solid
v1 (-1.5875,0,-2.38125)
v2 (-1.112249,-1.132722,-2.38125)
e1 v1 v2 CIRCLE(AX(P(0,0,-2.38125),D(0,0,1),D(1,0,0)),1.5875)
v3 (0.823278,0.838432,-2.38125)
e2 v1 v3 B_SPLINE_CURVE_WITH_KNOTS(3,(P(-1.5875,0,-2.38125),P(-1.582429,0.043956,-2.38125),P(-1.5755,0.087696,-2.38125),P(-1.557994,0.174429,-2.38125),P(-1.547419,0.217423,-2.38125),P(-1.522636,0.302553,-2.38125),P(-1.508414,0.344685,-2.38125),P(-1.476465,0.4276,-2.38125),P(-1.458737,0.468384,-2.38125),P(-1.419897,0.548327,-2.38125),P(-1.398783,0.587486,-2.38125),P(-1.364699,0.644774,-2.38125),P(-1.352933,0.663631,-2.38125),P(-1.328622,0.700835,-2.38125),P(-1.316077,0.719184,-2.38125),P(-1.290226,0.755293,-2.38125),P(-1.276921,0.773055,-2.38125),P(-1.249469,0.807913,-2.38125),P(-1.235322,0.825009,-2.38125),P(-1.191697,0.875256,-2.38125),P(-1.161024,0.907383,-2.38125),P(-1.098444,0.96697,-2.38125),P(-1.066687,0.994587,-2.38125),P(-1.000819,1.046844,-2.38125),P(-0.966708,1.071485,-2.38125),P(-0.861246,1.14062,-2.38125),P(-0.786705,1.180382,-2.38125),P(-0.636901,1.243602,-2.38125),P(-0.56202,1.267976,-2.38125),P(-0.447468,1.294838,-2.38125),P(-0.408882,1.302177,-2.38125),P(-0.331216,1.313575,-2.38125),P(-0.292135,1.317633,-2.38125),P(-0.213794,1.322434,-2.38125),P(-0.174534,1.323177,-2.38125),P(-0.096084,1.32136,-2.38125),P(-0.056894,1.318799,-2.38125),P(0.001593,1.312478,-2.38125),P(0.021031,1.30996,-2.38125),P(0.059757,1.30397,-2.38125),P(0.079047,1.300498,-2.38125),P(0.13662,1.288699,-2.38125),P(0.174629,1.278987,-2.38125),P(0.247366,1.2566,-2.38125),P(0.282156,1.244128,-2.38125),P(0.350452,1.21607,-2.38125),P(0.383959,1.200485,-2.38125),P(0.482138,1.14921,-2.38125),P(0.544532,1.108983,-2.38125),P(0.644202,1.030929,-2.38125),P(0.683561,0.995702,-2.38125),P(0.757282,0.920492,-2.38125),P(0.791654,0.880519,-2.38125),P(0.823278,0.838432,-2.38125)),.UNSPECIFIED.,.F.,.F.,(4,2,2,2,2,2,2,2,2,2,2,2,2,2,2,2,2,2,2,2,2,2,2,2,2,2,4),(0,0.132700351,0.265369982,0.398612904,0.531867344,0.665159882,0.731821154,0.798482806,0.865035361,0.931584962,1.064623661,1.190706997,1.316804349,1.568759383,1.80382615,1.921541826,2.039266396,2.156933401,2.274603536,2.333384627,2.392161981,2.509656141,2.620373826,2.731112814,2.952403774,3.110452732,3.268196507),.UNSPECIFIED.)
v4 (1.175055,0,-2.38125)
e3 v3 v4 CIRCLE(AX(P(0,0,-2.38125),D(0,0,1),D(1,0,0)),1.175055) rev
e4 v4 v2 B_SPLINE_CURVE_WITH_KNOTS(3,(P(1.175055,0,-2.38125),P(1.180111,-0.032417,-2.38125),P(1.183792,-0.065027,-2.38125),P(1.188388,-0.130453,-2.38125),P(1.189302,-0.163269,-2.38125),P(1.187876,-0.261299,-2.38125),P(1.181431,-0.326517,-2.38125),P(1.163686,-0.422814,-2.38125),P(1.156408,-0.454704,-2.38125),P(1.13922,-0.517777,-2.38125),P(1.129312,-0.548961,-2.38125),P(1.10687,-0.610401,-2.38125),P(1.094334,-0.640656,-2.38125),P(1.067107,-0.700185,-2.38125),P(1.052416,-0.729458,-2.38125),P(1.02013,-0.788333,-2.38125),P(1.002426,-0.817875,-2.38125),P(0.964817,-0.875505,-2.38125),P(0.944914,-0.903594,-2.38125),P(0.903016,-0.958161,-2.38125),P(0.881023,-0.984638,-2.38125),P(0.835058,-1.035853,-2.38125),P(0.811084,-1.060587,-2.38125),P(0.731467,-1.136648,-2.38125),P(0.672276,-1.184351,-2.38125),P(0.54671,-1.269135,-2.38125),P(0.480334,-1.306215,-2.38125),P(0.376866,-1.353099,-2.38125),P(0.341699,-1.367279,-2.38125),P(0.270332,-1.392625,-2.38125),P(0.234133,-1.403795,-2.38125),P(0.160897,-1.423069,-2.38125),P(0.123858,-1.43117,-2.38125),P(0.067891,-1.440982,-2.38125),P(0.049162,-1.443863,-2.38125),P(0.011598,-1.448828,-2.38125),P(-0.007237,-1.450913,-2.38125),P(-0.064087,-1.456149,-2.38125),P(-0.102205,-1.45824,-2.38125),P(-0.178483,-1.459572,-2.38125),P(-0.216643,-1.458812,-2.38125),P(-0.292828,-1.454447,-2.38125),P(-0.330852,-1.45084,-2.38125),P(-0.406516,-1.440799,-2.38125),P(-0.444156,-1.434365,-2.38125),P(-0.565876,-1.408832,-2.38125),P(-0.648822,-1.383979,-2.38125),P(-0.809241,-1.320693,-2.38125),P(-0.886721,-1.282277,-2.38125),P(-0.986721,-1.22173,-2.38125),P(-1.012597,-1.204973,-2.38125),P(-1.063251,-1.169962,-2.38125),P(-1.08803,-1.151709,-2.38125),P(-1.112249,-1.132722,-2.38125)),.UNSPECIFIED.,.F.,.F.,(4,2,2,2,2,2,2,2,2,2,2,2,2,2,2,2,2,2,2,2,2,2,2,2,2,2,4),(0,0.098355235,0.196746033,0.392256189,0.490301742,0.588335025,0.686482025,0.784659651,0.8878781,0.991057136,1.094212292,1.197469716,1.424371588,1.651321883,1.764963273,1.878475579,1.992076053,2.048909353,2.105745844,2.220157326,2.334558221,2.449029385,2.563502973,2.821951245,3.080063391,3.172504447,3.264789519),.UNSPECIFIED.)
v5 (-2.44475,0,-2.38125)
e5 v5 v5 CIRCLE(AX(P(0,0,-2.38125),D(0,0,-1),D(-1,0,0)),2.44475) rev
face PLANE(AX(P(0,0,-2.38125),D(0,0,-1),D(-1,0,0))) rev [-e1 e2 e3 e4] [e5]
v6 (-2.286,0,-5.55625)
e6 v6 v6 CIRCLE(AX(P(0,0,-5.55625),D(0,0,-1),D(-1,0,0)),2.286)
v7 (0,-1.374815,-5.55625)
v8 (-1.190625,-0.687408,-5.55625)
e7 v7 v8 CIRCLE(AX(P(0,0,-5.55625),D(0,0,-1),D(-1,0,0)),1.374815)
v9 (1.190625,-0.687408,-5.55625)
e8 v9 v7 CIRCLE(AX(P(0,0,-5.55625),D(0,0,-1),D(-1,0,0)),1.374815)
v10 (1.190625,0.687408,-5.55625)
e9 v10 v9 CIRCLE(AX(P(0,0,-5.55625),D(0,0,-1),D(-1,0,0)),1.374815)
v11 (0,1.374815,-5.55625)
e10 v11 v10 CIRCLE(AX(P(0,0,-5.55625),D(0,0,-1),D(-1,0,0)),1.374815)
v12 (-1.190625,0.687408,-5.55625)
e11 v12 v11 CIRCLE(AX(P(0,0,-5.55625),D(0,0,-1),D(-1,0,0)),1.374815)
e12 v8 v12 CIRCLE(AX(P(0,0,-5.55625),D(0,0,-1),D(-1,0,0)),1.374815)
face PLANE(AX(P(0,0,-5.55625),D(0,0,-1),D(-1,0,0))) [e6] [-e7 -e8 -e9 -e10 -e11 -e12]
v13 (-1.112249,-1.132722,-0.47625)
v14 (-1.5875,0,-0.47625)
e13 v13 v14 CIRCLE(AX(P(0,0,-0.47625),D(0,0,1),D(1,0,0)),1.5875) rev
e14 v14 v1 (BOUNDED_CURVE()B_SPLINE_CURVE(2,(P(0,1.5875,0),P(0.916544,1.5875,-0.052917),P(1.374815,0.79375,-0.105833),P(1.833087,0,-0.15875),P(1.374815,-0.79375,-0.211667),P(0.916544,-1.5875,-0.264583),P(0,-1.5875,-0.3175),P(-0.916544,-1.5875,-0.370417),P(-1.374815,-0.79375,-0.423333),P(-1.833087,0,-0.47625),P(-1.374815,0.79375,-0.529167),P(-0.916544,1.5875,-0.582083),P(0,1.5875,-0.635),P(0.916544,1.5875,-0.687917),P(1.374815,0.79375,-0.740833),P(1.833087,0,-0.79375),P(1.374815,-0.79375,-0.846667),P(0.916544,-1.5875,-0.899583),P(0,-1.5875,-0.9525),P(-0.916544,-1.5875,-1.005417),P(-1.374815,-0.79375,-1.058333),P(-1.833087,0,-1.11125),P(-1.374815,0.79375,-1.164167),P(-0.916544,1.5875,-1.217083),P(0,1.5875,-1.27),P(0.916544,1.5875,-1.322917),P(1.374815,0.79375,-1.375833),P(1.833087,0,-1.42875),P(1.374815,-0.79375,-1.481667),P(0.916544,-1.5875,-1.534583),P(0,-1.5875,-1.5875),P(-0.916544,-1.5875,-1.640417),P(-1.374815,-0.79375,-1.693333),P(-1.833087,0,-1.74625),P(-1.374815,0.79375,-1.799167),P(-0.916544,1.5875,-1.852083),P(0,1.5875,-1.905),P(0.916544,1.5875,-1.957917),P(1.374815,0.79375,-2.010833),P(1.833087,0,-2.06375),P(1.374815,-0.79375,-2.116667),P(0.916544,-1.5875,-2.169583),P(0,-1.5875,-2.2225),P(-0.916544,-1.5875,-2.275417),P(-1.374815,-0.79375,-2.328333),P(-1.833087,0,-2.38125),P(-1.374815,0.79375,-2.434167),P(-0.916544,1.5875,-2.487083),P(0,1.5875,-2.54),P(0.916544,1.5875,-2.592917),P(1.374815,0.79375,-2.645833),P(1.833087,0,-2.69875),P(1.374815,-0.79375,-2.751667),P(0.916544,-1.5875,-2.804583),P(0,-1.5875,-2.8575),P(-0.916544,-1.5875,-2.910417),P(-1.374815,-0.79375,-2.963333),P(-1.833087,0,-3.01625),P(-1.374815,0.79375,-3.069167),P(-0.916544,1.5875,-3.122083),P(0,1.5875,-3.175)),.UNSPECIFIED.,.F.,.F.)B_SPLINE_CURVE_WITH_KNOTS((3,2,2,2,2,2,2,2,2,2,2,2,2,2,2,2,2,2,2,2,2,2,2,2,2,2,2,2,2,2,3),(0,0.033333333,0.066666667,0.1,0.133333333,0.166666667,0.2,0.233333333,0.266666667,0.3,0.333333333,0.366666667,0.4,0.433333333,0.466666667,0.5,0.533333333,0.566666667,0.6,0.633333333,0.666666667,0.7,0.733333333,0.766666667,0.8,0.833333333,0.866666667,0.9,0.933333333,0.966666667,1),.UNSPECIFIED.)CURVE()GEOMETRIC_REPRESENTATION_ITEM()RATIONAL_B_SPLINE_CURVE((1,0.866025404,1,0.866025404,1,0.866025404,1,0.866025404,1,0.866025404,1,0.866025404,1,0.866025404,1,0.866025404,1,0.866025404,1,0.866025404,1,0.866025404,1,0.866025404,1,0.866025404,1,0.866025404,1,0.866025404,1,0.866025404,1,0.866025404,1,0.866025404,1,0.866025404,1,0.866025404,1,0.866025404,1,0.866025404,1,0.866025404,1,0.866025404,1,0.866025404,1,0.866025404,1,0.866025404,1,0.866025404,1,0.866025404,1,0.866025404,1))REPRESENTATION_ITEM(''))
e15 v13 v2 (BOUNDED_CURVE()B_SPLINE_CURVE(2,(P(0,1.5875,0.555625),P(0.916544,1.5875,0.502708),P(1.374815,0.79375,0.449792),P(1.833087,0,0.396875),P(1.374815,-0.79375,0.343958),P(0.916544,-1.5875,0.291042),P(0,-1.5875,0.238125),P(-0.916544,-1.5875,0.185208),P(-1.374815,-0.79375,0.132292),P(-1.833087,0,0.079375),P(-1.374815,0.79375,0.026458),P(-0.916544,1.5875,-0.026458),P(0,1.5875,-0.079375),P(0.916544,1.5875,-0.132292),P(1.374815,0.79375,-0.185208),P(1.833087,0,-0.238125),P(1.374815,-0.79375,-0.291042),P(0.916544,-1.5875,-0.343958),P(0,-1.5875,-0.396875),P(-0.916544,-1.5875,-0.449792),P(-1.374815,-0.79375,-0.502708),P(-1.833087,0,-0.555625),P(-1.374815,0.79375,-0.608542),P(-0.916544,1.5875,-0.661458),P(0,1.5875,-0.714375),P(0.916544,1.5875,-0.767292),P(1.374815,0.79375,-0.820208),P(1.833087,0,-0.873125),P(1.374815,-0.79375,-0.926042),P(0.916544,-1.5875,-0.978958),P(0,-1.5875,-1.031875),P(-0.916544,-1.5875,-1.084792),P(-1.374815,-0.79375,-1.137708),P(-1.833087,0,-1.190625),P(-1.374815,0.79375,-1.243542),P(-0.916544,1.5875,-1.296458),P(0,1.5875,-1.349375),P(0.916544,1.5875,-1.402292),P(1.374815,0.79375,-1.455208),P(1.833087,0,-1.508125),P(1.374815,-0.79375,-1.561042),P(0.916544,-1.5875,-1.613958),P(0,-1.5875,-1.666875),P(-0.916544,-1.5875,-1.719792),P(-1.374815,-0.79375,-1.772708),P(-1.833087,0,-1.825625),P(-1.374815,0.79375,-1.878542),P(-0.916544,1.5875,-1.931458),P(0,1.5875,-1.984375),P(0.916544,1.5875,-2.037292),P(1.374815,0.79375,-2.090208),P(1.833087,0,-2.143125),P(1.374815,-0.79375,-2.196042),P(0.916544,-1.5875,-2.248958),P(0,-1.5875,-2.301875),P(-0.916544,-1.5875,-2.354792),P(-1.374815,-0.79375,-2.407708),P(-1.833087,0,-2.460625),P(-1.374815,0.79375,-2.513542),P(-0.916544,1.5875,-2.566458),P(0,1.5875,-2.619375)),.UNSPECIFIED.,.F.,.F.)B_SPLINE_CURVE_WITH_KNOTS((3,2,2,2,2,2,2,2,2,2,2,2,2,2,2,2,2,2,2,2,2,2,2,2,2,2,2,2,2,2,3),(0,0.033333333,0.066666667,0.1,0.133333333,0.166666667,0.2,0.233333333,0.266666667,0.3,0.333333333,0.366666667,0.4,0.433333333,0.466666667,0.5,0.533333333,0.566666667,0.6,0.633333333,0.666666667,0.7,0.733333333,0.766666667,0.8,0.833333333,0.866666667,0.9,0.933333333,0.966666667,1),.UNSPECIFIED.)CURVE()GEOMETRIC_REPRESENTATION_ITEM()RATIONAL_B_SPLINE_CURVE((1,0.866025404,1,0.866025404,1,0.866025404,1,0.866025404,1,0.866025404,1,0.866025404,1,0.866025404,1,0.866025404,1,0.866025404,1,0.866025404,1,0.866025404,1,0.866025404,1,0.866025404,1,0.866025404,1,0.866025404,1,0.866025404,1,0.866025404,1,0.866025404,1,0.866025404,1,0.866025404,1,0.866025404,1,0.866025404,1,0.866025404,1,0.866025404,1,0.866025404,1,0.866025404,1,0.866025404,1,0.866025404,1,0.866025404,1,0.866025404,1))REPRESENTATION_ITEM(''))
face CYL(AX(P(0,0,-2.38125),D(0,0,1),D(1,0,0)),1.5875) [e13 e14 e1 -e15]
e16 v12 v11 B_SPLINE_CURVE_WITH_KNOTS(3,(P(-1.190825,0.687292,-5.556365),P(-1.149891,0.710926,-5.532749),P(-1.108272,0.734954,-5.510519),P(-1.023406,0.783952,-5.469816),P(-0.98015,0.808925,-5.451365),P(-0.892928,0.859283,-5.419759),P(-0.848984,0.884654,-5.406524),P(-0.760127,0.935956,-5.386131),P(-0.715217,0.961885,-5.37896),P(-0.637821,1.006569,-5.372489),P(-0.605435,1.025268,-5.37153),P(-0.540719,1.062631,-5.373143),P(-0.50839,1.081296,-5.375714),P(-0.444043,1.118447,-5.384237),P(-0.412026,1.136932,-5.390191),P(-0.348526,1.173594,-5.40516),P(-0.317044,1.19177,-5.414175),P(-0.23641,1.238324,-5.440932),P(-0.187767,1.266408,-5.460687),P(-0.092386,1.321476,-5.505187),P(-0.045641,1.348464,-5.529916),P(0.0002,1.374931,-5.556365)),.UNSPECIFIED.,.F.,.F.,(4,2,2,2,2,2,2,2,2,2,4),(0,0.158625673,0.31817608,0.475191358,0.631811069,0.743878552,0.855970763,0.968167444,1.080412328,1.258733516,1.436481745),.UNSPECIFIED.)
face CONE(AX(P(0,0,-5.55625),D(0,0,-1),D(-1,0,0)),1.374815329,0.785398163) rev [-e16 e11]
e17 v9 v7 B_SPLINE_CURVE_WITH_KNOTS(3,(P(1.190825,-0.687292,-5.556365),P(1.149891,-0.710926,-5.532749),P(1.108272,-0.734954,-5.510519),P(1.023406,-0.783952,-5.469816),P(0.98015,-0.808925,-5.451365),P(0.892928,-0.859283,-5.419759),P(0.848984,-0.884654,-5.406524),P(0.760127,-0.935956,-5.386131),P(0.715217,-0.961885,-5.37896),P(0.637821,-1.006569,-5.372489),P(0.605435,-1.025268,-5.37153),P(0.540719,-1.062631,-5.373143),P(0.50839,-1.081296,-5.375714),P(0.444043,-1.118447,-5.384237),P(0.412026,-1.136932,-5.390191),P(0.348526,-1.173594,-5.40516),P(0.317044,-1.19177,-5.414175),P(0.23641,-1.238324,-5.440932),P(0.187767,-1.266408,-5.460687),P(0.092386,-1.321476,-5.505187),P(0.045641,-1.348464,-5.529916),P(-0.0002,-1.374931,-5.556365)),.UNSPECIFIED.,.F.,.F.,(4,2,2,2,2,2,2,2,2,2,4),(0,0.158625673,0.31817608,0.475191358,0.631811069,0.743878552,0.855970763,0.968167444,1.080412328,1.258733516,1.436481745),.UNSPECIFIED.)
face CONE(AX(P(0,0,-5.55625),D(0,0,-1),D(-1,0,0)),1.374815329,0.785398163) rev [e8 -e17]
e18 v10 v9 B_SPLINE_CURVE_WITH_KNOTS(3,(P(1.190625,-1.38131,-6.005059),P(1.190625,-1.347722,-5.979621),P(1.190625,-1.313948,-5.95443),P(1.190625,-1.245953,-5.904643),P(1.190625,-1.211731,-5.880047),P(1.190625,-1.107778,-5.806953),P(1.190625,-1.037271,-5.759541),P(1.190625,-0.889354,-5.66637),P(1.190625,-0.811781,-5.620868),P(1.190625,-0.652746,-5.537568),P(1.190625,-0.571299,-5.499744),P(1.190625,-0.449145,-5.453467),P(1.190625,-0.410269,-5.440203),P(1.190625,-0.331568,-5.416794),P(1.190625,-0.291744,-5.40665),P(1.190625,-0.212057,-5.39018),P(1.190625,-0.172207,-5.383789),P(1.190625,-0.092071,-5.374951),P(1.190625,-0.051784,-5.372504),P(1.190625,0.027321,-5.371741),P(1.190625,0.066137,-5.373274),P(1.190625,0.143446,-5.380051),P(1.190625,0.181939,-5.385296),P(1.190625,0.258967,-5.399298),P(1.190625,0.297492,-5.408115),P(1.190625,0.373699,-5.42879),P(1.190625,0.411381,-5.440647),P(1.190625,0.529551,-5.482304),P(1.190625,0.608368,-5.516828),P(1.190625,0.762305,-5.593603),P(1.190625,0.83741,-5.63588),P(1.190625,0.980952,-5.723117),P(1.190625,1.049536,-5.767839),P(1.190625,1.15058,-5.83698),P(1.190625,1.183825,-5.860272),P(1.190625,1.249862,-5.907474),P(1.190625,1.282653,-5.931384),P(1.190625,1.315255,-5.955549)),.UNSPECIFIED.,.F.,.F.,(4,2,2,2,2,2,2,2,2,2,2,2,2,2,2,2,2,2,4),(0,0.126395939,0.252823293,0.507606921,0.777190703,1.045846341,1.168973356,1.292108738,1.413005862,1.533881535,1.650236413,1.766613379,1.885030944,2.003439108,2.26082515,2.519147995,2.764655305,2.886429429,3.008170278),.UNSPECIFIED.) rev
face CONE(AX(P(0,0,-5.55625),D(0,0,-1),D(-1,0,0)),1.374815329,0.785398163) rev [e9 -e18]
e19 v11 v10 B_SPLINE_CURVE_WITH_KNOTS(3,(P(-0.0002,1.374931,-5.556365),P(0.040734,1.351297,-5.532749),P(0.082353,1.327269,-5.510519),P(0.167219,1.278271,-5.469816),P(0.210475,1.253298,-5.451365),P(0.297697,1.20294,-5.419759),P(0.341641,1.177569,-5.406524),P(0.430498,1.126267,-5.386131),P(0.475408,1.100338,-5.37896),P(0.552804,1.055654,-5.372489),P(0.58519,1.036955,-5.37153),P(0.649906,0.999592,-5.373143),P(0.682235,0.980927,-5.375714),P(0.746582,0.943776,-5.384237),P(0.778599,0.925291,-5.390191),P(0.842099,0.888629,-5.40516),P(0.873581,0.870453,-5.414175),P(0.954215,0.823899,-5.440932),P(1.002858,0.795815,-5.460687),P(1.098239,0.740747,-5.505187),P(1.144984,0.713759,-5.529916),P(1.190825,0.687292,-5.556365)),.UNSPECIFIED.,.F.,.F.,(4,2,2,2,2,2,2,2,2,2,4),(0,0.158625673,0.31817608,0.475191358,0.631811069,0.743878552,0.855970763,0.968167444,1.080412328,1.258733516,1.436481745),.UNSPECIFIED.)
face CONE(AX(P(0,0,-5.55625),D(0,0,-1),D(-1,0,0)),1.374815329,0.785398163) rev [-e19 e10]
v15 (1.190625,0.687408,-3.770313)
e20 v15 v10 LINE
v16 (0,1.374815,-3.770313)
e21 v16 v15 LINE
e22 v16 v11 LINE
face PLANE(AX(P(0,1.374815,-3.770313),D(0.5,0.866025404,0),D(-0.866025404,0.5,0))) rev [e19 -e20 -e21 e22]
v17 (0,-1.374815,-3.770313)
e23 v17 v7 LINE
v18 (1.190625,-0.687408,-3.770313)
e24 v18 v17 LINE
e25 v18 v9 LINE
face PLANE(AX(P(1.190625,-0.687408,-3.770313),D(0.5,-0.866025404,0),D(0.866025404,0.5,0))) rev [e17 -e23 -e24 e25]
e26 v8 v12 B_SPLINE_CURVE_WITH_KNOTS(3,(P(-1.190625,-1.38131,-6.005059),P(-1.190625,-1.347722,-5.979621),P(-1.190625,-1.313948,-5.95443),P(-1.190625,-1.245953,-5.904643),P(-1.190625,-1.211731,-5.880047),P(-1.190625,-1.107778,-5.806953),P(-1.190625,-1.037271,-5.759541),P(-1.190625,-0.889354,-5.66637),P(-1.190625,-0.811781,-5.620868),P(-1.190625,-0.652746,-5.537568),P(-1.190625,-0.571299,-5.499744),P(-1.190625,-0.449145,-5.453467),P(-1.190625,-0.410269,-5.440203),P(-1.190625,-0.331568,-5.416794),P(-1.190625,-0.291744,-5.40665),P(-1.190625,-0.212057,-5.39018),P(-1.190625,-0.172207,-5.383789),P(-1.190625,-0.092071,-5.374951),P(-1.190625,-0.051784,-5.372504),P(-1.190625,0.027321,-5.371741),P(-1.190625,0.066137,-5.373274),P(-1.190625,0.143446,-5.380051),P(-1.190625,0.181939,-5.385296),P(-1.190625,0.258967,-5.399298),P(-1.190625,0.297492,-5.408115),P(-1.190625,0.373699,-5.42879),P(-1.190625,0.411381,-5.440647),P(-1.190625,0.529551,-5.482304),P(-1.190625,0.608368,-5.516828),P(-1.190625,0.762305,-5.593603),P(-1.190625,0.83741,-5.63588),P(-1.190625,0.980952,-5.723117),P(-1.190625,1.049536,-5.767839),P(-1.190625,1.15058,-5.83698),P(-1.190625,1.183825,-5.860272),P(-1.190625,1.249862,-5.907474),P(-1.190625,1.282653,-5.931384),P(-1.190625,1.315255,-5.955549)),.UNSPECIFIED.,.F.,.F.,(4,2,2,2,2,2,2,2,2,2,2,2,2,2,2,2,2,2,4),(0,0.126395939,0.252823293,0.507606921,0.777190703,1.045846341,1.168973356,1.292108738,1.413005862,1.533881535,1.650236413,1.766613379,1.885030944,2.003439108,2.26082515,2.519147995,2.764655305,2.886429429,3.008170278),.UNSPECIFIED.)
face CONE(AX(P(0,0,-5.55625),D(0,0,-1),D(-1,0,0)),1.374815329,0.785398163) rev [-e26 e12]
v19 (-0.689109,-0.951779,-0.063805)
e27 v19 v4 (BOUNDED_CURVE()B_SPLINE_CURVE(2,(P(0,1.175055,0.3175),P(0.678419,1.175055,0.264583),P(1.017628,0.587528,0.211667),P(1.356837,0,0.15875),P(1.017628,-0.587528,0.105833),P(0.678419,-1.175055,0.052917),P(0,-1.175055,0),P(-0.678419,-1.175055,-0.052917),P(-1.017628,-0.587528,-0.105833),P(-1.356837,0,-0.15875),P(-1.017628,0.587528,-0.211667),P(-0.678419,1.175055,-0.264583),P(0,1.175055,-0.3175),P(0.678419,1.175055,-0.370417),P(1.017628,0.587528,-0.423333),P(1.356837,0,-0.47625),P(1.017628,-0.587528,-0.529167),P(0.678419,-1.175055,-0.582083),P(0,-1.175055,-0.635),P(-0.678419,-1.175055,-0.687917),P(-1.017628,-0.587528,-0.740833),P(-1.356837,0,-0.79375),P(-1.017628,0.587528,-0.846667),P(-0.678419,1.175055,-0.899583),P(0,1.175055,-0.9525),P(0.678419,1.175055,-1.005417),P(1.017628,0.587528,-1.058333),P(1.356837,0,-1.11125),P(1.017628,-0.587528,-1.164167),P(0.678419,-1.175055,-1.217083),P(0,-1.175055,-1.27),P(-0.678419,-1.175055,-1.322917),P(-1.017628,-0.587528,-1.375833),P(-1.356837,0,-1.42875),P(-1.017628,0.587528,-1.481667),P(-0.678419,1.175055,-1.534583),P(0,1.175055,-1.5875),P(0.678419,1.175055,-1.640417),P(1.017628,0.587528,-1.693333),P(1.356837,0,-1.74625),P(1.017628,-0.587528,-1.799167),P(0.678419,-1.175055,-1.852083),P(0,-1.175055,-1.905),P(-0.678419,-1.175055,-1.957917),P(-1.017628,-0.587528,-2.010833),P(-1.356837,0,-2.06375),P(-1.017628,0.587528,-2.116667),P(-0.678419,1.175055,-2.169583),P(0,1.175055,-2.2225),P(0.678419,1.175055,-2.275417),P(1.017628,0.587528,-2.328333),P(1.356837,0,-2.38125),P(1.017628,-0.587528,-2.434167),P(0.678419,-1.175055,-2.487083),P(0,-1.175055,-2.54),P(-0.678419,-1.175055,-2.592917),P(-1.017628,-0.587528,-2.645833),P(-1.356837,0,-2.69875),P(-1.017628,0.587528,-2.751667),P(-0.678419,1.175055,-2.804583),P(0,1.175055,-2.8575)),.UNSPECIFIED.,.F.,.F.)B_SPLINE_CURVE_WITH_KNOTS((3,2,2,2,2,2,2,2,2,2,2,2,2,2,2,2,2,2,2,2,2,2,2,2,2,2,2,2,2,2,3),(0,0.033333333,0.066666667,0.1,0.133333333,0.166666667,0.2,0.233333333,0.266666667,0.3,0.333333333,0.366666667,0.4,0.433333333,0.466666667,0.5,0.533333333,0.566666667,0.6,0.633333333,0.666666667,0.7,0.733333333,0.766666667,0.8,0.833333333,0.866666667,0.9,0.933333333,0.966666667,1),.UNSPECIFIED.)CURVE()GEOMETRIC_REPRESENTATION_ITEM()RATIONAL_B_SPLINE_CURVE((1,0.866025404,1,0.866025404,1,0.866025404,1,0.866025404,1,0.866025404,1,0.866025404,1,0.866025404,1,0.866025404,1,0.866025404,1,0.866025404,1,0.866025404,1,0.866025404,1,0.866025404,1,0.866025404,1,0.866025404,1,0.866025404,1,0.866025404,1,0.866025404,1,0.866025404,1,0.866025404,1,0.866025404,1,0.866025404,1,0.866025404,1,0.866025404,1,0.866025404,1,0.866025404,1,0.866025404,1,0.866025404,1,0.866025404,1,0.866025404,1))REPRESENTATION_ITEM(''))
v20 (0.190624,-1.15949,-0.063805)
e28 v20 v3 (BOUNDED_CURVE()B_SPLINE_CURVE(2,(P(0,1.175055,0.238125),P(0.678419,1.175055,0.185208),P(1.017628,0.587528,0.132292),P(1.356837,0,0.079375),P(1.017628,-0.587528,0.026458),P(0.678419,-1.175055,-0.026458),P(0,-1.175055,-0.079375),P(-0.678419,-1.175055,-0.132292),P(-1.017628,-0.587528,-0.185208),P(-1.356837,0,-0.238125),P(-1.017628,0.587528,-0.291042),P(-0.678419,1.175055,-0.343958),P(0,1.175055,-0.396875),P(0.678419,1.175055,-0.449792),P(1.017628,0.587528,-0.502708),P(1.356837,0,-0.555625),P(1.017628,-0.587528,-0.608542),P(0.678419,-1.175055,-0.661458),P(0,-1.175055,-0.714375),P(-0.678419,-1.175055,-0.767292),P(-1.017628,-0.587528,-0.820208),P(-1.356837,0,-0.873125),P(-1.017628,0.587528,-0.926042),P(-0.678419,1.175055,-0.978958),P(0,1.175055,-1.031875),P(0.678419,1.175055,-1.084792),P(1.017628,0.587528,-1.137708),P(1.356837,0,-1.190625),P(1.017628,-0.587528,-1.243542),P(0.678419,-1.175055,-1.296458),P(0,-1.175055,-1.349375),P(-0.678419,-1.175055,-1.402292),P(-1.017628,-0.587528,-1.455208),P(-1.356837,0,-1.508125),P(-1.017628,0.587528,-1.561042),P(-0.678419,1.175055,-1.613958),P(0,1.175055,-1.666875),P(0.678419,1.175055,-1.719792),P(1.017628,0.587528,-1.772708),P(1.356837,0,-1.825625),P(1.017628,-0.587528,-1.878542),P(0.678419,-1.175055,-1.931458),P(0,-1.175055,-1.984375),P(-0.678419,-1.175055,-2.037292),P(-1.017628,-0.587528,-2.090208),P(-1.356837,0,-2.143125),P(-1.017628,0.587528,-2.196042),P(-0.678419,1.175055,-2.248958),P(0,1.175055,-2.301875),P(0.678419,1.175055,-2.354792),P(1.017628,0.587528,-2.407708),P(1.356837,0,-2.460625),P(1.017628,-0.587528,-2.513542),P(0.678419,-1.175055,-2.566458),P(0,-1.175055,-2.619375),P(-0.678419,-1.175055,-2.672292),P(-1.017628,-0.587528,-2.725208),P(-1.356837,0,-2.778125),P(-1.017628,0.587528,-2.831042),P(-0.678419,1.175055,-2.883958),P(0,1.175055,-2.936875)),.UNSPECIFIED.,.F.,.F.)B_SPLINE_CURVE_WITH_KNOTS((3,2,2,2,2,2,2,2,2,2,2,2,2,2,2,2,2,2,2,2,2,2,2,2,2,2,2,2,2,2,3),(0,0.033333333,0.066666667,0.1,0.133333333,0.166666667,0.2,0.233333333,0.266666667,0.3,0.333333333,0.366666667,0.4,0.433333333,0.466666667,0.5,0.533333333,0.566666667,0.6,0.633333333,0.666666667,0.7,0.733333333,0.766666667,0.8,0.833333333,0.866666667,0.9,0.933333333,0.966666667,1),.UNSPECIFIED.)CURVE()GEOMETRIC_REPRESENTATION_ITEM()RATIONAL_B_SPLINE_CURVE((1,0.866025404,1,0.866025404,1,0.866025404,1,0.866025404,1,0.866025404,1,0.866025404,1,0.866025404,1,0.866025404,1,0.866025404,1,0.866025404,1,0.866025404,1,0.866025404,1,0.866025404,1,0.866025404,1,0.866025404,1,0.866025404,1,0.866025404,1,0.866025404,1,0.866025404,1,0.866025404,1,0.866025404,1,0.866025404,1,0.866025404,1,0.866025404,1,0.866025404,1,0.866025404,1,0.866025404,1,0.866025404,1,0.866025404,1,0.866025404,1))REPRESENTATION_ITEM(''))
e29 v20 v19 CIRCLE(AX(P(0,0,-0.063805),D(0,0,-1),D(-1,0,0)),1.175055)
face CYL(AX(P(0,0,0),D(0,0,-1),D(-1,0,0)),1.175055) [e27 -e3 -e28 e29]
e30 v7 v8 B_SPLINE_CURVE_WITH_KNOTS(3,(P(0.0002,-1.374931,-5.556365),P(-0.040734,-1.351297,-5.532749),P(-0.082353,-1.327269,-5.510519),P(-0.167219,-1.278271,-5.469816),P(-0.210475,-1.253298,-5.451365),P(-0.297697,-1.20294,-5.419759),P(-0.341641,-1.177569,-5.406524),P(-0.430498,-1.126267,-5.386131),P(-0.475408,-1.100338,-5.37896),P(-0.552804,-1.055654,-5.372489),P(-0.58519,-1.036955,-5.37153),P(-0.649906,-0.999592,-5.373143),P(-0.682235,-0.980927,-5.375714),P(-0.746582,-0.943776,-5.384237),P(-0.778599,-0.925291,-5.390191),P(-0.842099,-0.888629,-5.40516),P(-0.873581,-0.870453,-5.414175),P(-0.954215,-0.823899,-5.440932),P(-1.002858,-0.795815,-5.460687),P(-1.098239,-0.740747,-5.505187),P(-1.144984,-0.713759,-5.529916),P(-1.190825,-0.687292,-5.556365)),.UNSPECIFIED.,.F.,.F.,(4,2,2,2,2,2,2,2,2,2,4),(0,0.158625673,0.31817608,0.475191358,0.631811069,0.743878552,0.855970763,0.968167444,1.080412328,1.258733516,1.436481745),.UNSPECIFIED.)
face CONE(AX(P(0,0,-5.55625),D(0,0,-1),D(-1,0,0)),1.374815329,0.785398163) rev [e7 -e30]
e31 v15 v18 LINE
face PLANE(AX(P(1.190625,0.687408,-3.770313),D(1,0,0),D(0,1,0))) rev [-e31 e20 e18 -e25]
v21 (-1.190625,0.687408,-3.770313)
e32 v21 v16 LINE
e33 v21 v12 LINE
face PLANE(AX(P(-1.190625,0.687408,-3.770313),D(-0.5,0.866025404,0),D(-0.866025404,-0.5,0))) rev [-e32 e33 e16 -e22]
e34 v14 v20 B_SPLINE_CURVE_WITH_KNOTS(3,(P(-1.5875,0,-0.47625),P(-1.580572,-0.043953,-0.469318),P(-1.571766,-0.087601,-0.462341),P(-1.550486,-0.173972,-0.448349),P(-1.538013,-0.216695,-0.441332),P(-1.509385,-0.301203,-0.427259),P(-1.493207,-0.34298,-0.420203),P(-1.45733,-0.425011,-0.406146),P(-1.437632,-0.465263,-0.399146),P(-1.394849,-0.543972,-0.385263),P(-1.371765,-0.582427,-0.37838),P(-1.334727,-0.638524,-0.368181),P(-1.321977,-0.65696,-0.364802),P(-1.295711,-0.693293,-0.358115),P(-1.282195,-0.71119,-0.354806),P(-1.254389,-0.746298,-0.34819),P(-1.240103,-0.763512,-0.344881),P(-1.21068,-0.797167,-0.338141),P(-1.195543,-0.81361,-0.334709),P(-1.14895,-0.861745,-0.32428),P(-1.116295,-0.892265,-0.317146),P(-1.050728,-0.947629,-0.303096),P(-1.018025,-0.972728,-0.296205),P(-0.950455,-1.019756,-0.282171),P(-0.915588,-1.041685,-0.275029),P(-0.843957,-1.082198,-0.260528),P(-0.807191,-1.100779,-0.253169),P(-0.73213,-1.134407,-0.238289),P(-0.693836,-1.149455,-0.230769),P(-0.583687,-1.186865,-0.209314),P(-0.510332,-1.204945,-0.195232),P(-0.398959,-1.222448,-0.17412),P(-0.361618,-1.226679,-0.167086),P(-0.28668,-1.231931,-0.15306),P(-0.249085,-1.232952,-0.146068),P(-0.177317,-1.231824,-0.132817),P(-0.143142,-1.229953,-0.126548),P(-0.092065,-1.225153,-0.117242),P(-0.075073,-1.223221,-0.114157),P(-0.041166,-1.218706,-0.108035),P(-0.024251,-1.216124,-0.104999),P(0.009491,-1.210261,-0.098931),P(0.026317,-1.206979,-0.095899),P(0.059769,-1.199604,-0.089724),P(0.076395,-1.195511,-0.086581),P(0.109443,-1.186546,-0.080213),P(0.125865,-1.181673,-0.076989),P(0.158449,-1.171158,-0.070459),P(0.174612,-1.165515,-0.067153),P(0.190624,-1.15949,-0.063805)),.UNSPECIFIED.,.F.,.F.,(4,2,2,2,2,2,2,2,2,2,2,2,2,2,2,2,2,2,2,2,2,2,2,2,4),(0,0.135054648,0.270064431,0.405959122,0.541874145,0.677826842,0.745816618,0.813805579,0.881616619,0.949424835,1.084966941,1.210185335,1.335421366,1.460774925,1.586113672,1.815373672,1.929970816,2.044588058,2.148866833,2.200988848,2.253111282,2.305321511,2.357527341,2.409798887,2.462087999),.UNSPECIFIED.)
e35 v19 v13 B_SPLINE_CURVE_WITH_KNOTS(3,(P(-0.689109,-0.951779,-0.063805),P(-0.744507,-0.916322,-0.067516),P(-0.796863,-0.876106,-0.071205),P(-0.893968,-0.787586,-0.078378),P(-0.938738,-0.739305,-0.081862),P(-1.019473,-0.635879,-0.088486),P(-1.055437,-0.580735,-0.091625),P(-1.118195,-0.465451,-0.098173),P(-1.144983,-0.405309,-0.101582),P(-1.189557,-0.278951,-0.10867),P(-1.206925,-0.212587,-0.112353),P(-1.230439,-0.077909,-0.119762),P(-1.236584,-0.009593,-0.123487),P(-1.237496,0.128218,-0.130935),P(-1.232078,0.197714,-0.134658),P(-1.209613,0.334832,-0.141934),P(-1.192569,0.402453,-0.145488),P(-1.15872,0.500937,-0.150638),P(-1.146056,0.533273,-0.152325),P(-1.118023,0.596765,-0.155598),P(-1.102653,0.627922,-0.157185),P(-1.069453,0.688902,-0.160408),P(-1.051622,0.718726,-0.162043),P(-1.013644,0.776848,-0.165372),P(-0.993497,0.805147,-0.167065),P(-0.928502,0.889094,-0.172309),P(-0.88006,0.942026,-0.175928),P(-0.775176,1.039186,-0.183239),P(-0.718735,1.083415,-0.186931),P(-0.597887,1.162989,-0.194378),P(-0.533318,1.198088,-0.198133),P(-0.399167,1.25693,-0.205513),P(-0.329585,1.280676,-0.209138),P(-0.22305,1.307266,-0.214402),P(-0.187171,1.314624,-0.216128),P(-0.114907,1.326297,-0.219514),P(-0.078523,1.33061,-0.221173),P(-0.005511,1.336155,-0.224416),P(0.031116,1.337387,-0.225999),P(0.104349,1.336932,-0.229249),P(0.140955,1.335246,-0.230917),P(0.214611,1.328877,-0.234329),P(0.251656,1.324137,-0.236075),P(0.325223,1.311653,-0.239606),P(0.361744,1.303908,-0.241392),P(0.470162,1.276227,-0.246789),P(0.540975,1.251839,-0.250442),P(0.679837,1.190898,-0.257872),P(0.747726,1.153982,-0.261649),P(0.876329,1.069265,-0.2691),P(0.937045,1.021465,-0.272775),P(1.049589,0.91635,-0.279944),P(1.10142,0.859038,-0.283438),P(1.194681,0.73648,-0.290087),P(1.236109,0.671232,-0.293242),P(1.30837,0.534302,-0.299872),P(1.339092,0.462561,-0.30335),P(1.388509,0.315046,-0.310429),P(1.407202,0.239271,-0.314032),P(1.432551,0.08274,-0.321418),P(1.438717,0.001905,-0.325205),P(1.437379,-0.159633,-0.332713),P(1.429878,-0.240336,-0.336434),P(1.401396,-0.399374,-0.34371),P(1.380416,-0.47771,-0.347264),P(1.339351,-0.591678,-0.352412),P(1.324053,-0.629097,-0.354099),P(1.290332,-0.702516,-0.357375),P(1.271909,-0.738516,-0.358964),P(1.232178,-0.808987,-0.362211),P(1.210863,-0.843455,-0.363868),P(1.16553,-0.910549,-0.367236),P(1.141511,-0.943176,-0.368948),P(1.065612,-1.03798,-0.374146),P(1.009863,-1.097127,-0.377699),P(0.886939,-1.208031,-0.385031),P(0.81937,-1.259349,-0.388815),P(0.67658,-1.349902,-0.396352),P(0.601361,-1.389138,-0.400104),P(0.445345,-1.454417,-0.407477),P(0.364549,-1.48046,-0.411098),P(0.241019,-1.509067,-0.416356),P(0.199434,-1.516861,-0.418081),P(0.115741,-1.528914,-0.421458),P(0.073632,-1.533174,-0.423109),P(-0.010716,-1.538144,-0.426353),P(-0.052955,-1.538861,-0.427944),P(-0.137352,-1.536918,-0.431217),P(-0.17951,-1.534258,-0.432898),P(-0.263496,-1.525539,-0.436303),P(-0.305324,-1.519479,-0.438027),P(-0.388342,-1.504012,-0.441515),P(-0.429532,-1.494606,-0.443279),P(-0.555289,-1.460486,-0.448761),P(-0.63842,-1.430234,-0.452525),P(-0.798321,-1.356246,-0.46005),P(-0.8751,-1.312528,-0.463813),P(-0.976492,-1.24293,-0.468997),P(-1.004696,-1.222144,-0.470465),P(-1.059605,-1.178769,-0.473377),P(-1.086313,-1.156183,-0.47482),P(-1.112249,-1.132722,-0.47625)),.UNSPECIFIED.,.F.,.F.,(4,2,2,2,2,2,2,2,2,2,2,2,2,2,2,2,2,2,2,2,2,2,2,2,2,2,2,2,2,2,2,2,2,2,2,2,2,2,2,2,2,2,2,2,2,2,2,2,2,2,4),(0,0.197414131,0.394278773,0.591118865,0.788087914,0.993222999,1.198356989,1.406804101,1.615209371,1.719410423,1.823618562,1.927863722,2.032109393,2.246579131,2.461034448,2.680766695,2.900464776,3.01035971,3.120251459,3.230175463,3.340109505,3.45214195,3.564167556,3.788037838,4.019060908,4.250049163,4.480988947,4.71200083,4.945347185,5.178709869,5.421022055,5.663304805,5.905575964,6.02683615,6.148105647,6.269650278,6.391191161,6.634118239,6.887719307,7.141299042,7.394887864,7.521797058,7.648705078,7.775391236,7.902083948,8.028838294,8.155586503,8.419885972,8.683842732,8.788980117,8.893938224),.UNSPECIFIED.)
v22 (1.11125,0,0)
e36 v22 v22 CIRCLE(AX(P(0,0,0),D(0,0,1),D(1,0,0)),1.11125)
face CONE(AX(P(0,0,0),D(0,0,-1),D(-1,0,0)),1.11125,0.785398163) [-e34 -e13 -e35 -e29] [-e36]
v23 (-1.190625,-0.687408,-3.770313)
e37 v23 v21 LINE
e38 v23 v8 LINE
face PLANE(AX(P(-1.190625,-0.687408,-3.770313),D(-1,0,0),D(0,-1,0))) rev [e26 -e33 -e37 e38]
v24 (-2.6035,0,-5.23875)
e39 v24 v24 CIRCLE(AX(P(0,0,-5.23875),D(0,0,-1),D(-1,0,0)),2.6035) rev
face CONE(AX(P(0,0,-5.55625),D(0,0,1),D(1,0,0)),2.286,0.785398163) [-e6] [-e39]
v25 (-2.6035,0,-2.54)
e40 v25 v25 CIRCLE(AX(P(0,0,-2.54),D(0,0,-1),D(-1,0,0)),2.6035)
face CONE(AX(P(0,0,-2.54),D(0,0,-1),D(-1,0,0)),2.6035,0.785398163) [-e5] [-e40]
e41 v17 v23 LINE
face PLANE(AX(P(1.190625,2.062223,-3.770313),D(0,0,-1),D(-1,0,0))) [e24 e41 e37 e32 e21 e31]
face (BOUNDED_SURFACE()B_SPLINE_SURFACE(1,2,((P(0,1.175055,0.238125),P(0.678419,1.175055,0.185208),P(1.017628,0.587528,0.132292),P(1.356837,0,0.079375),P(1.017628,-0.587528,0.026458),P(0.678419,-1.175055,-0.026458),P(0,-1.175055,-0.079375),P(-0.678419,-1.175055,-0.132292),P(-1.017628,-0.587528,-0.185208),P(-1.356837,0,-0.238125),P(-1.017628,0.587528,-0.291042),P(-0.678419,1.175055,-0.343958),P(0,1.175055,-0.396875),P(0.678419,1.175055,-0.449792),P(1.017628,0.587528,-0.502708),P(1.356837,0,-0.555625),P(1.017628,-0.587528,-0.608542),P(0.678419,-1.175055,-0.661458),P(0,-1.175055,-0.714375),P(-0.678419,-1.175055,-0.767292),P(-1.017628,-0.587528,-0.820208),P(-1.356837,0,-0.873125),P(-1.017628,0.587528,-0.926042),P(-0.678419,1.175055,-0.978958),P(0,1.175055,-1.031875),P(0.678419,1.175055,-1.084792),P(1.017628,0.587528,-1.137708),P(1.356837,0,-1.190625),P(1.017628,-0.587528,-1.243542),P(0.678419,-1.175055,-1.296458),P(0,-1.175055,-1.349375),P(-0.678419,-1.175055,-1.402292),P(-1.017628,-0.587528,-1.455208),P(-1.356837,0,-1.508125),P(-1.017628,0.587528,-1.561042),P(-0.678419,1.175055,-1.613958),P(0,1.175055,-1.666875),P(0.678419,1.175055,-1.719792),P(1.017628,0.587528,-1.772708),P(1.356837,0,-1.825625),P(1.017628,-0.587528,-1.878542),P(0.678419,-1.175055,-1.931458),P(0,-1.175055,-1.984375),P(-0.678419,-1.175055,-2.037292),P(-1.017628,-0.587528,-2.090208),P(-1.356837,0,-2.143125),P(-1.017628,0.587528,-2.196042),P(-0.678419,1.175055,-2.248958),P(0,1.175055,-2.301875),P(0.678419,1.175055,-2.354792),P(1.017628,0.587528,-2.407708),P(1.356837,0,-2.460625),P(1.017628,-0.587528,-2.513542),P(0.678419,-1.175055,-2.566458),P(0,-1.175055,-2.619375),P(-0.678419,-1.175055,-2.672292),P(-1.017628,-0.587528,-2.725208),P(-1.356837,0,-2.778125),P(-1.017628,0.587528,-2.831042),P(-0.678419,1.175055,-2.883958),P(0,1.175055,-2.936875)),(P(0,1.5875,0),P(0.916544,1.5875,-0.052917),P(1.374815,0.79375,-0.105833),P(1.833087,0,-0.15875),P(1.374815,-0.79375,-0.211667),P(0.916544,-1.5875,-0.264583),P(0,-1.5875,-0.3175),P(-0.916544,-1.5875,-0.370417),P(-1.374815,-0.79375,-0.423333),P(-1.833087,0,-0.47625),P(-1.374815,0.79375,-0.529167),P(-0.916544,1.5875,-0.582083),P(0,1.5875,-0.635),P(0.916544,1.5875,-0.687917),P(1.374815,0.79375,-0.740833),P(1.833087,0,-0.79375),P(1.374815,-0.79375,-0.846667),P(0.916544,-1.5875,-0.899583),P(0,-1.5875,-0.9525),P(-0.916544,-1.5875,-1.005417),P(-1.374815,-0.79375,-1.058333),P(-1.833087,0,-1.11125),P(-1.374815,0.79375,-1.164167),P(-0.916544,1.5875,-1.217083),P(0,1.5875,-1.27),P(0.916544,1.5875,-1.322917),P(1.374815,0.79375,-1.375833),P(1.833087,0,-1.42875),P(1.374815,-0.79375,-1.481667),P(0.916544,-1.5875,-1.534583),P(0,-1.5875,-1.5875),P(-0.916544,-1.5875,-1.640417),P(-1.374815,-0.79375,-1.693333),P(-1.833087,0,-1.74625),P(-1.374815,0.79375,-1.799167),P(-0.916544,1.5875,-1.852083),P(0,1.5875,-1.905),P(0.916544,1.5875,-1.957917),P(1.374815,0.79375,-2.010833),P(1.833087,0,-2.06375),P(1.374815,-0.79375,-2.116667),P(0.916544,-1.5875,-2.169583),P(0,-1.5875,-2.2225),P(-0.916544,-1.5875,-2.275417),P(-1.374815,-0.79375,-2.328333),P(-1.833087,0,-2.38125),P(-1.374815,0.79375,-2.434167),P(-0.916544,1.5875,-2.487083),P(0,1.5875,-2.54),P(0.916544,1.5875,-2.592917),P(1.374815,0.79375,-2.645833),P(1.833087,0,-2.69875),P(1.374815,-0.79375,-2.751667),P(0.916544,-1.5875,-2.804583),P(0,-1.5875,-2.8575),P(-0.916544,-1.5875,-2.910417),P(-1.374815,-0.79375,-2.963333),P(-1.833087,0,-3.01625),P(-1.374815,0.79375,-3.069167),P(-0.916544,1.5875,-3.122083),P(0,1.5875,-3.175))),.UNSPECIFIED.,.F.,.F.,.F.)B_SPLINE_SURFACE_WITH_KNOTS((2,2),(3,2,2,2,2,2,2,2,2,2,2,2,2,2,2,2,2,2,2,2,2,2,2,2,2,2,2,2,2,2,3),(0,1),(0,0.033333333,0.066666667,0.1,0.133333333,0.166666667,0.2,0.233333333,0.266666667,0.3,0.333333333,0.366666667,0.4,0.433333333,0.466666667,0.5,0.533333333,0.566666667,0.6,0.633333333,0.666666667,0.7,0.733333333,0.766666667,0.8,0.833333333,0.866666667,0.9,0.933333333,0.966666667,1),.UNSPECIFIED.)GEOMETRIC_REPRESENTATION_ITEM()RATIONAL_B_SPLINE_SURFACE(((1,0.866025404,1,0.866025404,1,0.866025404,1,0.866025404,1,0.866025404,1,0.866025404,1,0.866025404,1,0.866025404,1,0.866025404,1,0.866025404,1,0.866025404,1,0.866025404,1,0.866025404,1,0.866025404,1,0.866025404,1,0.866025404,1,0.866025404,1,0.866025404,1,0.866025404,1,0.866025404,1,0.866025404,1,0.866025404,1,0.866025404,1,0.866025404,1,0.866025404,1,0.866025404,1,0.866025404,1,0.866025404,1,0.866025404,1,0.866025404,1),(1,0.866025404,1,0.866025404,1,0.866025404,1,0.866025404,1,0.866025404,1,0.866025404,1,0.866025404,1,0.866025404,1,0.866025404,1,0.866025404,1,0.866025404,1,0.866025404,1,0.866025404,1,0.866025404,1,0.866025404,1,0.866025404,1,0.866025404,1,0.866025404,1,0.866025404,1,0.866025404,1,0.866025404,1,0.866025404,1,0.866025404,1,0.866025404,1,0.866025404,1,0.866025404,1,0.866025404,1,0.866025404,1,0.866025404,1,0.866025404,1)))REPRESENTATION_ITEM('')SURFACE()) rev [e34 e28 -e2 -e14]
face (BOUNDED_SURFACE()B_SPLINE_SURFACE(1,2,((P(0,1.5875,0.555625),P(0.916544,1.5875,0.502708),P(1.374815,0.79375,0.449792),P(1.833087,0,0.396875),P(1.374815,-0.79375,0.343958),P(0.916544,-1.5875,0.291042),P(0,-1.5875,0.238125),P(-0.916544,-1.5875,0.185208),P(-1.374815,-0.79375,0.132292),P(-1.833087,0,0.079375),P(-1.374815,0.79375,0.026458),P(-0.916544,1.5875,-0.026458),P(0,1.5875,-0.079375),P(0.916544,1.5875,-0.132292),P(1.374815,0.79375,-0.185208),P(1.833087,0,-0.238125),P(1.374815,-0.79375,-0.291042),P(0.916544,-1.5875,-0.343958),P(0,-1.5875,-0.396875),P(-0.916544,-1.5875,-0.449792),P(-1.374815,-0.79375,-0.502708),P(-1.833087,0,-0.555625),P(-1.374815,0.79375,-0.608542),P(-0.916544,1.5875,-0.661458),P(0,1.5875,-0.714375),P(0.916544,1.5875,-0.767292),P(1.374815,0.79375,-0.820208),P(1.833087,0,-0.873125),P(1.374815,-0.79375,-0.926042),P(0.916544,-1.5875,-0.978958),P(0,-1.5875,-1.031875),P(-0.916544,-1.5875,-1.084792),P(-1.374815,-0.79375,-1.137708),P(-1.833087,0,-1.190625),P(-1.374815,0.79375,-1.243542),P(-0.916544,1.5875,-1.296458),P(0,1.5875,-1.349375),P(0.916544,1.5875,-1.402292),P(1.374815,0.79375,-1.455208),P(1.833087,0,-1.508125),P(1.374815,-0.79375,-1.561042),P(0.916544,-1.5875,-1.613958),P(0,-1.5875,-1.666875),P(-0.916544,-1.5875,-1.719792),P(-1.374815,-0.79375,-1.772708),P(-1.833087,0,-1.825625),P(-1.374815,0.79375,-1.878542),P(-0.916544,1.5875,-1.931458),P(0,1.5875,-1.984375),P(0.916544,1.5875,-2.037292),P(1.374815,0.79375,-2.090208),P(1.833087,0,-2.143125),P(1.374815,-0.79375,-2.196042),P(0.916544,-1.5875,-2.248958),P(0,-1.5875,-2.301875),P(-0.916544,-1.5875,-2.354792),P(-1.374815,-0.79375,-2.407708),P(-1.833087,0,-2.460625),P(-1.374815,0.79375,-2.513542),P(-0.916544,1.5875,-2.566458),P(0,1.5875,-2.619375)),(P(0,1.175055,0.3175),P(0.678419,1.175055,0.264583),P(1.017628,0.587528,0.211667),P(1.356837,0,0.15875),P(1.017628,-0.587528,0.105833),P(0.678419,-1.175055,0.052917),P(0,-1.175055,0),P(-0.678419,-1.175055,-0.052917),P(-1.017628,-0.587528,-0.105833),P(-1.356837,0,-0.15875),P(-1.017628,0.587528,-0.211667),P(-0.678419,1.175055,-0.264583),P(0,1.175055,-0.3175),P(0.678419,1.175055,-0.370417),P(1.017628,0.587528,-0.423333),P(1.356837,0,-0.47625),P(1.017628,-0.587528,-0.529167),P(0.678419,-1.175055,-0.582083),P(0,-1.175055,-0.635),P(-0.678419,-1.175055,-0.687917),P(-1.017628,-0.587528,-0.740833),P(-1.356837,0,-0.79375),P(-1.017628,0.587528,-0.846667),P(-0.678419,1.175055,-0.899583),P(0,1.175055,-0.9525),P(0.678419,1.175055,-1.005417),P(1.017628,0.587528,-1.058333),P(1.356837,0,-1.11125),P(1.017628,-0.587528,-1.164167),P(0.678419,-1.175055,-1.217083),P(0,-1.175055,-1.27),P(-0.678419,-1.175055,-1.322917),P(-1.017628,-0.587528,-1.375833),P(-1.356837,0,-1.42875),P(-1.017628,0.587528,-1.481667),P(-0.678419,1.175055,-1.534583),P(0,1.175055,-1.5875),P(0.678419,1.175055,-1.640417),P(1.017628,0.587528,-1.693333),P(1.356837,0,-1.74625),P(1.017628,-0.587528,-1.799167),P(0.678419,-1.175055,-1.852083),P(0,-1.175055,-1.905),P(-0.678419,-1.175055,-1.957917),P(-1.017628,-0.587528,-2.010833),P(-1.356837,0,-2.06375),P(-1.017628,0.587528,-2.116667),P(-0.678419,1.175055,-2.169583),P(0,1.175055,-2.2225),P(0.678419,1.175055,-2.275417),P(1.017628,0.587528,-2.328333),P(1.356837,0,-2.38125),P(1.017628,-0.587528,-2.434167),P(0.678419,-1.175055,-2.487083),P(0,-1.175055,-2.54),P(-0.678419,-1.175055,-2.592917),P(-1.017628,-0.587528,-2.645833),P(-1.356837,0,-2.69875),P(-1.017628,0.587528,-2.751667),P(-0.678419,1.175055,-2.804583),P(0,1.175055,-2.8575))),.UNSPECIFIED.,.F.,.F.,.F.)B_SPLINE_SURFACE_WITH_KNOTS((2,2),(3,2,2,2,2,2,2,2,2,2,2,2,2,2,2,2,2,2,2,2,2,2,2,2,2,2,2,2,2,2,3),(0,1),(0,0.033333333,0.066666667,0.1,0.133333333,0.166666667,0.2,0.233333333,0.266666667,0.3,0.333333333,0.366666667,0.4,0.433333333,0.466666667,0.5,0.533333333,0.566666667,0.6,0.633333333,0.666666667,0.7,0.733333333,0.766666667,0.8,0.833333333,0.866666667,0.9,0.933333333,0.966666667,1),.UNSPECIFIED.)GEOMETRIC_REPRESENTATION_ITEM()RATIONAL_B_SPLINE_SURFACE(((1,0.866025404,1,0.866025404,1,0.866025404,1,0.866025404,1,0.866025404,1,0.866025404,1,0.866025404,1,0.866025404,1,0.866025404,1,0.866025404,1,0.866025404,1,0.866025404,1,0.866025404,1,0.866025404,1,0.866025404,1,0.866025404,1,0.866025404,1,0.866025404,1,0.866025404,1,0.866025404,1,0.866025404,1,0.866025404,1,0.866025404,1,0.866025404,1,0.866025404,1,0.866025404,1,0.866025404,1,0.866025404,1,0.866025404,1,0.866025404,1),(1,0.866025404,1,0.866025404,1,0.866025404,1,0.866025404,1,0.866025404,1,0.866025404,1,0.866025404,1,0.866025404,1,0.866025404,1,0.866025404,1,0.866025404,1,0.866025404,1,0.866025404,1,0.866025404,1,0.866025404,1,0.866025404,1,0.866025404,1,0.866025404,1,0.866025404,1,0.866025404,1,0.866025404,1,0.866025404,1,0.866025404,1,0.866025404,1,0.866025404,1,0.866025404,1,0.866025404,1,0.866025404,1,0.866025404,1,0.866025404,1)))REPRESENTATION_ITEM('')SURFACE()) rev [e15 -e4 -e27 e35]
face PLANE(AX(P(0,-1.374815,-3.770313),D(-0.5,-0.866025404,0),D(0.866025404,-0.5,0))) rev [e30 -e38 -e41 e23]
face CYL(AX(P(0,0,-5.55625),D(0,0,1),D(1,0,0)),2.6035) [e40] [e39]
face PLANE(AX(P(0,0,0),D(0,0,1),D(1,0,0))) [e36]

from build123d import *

# Parameters (mm, degrees)
SKETCH1_R          = 1.5875
EXTRUDE1_DEPTH     = 2.38125
CHAMFER3_SIZE      = 0.47625
CUT_SWEEP1_PITCH   = 0.635
SKETCH6_R          = 2.6035
EXTRUDE2_DEPTH     = 3.175
CUT_EXTRUDE1_DEPTH = 1.7859375
SKETCH8_R          = 1.374815329
CUT_EXTRUDE2_DEPTH = 0.3175
CUT_EXTRUDE2_DRAFT = -45
CHAMFER1_SIZE      = 0.3175
CHAMFER2_SIZE      = 0.15875


with BuildPart() as part:
    # Sketch1 → Extrude1 (new body)
    with BuildSketch(Plane.XY):
        Circle(SKETCH1_R)
    extrude(amount=-EXTRUDE1_DEPTH)

    # Chamfer3
    chamfer3_edges = [part.edges().sort_by_distance(p)[0] for p in [
        (-1.5875, 0, 0),
    ]]
    chamfer(chamfer3_edges, length=CHAMFER3_SIZE)

    # Cut-Sweep1: the profile of Sketch3 profile screwed along a right-hand helix of 4.75 turns, 6 arcs to a turn; built about Z, then put on its axis
    cut_sweep1_z = Axis((0, 0, 0), (0, 0, 1))
    cut_sweep1_corners = [(1.5878, 0, -0.555798205), (1.175055401, 0, -0.3175), (1.175055401, 0, -0.238125), (1.5878, 0, 0.000173205)]
    with BuildLine(mode=Mode.PRIVATE) as cut_sweep1_profile:
        Line(cut_sweep1_corners[0], cut_sweep1_corners[1])
        Line(cut_sweep1_corners[1], cut_sweep1_corners[2])
        Line(cut_sweep1_corners[2], cut_sweep1_corners[3])
        Line(cut_sweep1_corners[3], cut_sweep1_corners[0])
    cut_sweep1_cap = Face(cut_sweep1_profile.wire())
    cut_sweep1_turn_angles = [0, 30, 60, 90, 120, 150, 180, 210, 240, 270, 300, 330, 360]
    cut_sweep1_turn_weights = [1, 0.8660254037844387, 1, 0.8660254037844387, 1, 0.8660254037844387, 1, 0.8660254037844387, 1, 0.8660254037844387, 1, 0.8660254037844387, 1]
    cut_sweep1_turn_rails = [Edge.make_bspline([Vector(p[0], p[1], 0).rotate(cut_sweep1_z, cut_sweep1_turn_angles[k]) / cut_sweep1_turn_weights[k] + Vector(0, 0, p[2] + CUT_SWEEP1_PITCH * cut_sweep1_turn_angles[k] / 360) for k in range(13)], [0, 0, 0, 1, 1, 2, 2, 3, 3, 4, 4, 5, 5, 6, 6, 6], 2, cut_sweep1_turn_weights) for p in cut_sweep1_corners]
    cut_sweep1_turn_sides = [Face.make_surface_from_curves(cut_sweep1_turn_rails[p[0]], cut_sweep1_turn_rails[p[1]]) for p in [(0, 1), (1, 2), (2, 3), (3, 0)]]
    cut_sweep1_last_angles = [1440, 1470, 1500, 1530, 1560, 1590, 1620, 1650, 1680, 1695, 1710]
    cut_sweep1_last_weights = [1, 0.8660254037844387, 1, 0.8660254037844387, 1, 0.8660254037844387, 1, 0.8660254037844387, 1, 0.9659258262890595, 1]
    cut_sweep1_last_rails = [Edge.make_bspline([Vector(p[0], p[1], 0).rotate(cut_sweep1_z, cut_sweep1_last_angles[k]) / cut_sweep1_last_weights[k] + Vector(0, 0, p[2] + CUT_SWEEP1_PITCH * cut_sweep1_last_angles[k] / 360) for k in range(11)], [0, 0, 0, 1, 1, 2, 2, 3, 3, 4, 4, 5, 5, 5], 2, cut_sweep1_last_weights) for p in cut_sweep1_corners]
    cut_sweep1_last_sides = [Face.make_surface_from_curves(cut_sweep1_last_rails[p[0]], cut_sweep1_last_rails[p[1]]) for p in [(0, 1), (1, 2), (2, 3), (3, 0)]]
    cut_sweep1 = Plane(origin=(0, 0, 0), x_dir=(0, 1, 0), z_dir=(0, 0, -1)) * Solid(Shell([*[p.moved(Location((0, 0, CUT_SWEEP1_PITCH * i))) for i in range(4) for p in cut_sweep1_turn_sides], *cut_sweep1_last_sides, cut_sweep1_cap, cut_sweep1_cap.rotate(cut_sweep1_z, 1710).moved(Location((0, 0, CUT_SWEEP1_PITCH * 1710 / 360)))]))
    add(cut_sweep1, mode=Mode.SUBTRACT)

    # Sketch6 → Extrude2 (add)
    with BuildSketch(Plane(origin=(0, 0, -2.38125), x_dir=(-1, 0, 0), z_dir=(0, 0, -1))):
        Circle(SKETCH6_R)
    extrude(amount=EXTRUDE2_DEPTH)

    # Sketch7 → Cut-Extrude1 (cut)
    with BuildSketch(Plane(origin=(0, 0, -5.55625), x_dir=(-1, 0, 0), z_dir=(0, 0, -1))):
        Polygon((0, 1.374815329), (-1.190625, 0.687407664), (-1.190625, -0.687407664), (0, -1.374815329), (1.190625, -0.687407664), (1.190625, 0.687407664), align=None)
    extrude(amount=-CUT_EXTRUDE1_DEPTH, mode=Mode.SUBTRACT)


with BuildPart() as cut_extrude2_tool:
    # Sketch8 → Cut-Extrude2 (with draft: the straight prism first)
    with BuildSketch(Plane(origin=(0, 0, -5.55625), x_dir=(-1, 0, 0), z_dir=(0, 0, -1))):
        Circle(SKETCH8_R)
    extrude(amount=-CUT_EXTRUDE2_DEPTH)
    # Cut-Extrude2: the draft: its side faces are tilted about the plane it starts from
    cut_extrude2_sides = [cut_extrude2_tool.faces().sort_by_distance(p)[0] for p in [
        (1.374815329, 0, -5.3975),
    ]]
    draft(cut_extrude2_sides, Plane(origin=(0, 0, -5.55625), x_dir=(-1, 0, 0), z_dir=(0, 0, -1)), CUT_EXTRUDE2_DRAFT)


with BuildPart() as part_1:
    add(part.part)

    # Cut-Extrude2: cut by cut_extrude2_tool
    add(cut_extrude2_tool.part, mode=Mode.SUBTRACT)

    # Chamfer1
    chamfer1_edges = [part_1.edges().sort_by_distance(p)[0] for p in [
        (2.6035, 0, -5.55625),
    ]]
    chamfer(chamfer1_edges, length=CHAMFER1_SIZE)

    # Chamfer2
    chamfer2_edges = [part_1.edges().sort_by_distance(p)[0] for p in [
        (2.6035, 0, -2.38125),
    ]]
    chamfer(chamfer2_edges, length=CHAMFER2_SIZE)


solid = part_1.part
